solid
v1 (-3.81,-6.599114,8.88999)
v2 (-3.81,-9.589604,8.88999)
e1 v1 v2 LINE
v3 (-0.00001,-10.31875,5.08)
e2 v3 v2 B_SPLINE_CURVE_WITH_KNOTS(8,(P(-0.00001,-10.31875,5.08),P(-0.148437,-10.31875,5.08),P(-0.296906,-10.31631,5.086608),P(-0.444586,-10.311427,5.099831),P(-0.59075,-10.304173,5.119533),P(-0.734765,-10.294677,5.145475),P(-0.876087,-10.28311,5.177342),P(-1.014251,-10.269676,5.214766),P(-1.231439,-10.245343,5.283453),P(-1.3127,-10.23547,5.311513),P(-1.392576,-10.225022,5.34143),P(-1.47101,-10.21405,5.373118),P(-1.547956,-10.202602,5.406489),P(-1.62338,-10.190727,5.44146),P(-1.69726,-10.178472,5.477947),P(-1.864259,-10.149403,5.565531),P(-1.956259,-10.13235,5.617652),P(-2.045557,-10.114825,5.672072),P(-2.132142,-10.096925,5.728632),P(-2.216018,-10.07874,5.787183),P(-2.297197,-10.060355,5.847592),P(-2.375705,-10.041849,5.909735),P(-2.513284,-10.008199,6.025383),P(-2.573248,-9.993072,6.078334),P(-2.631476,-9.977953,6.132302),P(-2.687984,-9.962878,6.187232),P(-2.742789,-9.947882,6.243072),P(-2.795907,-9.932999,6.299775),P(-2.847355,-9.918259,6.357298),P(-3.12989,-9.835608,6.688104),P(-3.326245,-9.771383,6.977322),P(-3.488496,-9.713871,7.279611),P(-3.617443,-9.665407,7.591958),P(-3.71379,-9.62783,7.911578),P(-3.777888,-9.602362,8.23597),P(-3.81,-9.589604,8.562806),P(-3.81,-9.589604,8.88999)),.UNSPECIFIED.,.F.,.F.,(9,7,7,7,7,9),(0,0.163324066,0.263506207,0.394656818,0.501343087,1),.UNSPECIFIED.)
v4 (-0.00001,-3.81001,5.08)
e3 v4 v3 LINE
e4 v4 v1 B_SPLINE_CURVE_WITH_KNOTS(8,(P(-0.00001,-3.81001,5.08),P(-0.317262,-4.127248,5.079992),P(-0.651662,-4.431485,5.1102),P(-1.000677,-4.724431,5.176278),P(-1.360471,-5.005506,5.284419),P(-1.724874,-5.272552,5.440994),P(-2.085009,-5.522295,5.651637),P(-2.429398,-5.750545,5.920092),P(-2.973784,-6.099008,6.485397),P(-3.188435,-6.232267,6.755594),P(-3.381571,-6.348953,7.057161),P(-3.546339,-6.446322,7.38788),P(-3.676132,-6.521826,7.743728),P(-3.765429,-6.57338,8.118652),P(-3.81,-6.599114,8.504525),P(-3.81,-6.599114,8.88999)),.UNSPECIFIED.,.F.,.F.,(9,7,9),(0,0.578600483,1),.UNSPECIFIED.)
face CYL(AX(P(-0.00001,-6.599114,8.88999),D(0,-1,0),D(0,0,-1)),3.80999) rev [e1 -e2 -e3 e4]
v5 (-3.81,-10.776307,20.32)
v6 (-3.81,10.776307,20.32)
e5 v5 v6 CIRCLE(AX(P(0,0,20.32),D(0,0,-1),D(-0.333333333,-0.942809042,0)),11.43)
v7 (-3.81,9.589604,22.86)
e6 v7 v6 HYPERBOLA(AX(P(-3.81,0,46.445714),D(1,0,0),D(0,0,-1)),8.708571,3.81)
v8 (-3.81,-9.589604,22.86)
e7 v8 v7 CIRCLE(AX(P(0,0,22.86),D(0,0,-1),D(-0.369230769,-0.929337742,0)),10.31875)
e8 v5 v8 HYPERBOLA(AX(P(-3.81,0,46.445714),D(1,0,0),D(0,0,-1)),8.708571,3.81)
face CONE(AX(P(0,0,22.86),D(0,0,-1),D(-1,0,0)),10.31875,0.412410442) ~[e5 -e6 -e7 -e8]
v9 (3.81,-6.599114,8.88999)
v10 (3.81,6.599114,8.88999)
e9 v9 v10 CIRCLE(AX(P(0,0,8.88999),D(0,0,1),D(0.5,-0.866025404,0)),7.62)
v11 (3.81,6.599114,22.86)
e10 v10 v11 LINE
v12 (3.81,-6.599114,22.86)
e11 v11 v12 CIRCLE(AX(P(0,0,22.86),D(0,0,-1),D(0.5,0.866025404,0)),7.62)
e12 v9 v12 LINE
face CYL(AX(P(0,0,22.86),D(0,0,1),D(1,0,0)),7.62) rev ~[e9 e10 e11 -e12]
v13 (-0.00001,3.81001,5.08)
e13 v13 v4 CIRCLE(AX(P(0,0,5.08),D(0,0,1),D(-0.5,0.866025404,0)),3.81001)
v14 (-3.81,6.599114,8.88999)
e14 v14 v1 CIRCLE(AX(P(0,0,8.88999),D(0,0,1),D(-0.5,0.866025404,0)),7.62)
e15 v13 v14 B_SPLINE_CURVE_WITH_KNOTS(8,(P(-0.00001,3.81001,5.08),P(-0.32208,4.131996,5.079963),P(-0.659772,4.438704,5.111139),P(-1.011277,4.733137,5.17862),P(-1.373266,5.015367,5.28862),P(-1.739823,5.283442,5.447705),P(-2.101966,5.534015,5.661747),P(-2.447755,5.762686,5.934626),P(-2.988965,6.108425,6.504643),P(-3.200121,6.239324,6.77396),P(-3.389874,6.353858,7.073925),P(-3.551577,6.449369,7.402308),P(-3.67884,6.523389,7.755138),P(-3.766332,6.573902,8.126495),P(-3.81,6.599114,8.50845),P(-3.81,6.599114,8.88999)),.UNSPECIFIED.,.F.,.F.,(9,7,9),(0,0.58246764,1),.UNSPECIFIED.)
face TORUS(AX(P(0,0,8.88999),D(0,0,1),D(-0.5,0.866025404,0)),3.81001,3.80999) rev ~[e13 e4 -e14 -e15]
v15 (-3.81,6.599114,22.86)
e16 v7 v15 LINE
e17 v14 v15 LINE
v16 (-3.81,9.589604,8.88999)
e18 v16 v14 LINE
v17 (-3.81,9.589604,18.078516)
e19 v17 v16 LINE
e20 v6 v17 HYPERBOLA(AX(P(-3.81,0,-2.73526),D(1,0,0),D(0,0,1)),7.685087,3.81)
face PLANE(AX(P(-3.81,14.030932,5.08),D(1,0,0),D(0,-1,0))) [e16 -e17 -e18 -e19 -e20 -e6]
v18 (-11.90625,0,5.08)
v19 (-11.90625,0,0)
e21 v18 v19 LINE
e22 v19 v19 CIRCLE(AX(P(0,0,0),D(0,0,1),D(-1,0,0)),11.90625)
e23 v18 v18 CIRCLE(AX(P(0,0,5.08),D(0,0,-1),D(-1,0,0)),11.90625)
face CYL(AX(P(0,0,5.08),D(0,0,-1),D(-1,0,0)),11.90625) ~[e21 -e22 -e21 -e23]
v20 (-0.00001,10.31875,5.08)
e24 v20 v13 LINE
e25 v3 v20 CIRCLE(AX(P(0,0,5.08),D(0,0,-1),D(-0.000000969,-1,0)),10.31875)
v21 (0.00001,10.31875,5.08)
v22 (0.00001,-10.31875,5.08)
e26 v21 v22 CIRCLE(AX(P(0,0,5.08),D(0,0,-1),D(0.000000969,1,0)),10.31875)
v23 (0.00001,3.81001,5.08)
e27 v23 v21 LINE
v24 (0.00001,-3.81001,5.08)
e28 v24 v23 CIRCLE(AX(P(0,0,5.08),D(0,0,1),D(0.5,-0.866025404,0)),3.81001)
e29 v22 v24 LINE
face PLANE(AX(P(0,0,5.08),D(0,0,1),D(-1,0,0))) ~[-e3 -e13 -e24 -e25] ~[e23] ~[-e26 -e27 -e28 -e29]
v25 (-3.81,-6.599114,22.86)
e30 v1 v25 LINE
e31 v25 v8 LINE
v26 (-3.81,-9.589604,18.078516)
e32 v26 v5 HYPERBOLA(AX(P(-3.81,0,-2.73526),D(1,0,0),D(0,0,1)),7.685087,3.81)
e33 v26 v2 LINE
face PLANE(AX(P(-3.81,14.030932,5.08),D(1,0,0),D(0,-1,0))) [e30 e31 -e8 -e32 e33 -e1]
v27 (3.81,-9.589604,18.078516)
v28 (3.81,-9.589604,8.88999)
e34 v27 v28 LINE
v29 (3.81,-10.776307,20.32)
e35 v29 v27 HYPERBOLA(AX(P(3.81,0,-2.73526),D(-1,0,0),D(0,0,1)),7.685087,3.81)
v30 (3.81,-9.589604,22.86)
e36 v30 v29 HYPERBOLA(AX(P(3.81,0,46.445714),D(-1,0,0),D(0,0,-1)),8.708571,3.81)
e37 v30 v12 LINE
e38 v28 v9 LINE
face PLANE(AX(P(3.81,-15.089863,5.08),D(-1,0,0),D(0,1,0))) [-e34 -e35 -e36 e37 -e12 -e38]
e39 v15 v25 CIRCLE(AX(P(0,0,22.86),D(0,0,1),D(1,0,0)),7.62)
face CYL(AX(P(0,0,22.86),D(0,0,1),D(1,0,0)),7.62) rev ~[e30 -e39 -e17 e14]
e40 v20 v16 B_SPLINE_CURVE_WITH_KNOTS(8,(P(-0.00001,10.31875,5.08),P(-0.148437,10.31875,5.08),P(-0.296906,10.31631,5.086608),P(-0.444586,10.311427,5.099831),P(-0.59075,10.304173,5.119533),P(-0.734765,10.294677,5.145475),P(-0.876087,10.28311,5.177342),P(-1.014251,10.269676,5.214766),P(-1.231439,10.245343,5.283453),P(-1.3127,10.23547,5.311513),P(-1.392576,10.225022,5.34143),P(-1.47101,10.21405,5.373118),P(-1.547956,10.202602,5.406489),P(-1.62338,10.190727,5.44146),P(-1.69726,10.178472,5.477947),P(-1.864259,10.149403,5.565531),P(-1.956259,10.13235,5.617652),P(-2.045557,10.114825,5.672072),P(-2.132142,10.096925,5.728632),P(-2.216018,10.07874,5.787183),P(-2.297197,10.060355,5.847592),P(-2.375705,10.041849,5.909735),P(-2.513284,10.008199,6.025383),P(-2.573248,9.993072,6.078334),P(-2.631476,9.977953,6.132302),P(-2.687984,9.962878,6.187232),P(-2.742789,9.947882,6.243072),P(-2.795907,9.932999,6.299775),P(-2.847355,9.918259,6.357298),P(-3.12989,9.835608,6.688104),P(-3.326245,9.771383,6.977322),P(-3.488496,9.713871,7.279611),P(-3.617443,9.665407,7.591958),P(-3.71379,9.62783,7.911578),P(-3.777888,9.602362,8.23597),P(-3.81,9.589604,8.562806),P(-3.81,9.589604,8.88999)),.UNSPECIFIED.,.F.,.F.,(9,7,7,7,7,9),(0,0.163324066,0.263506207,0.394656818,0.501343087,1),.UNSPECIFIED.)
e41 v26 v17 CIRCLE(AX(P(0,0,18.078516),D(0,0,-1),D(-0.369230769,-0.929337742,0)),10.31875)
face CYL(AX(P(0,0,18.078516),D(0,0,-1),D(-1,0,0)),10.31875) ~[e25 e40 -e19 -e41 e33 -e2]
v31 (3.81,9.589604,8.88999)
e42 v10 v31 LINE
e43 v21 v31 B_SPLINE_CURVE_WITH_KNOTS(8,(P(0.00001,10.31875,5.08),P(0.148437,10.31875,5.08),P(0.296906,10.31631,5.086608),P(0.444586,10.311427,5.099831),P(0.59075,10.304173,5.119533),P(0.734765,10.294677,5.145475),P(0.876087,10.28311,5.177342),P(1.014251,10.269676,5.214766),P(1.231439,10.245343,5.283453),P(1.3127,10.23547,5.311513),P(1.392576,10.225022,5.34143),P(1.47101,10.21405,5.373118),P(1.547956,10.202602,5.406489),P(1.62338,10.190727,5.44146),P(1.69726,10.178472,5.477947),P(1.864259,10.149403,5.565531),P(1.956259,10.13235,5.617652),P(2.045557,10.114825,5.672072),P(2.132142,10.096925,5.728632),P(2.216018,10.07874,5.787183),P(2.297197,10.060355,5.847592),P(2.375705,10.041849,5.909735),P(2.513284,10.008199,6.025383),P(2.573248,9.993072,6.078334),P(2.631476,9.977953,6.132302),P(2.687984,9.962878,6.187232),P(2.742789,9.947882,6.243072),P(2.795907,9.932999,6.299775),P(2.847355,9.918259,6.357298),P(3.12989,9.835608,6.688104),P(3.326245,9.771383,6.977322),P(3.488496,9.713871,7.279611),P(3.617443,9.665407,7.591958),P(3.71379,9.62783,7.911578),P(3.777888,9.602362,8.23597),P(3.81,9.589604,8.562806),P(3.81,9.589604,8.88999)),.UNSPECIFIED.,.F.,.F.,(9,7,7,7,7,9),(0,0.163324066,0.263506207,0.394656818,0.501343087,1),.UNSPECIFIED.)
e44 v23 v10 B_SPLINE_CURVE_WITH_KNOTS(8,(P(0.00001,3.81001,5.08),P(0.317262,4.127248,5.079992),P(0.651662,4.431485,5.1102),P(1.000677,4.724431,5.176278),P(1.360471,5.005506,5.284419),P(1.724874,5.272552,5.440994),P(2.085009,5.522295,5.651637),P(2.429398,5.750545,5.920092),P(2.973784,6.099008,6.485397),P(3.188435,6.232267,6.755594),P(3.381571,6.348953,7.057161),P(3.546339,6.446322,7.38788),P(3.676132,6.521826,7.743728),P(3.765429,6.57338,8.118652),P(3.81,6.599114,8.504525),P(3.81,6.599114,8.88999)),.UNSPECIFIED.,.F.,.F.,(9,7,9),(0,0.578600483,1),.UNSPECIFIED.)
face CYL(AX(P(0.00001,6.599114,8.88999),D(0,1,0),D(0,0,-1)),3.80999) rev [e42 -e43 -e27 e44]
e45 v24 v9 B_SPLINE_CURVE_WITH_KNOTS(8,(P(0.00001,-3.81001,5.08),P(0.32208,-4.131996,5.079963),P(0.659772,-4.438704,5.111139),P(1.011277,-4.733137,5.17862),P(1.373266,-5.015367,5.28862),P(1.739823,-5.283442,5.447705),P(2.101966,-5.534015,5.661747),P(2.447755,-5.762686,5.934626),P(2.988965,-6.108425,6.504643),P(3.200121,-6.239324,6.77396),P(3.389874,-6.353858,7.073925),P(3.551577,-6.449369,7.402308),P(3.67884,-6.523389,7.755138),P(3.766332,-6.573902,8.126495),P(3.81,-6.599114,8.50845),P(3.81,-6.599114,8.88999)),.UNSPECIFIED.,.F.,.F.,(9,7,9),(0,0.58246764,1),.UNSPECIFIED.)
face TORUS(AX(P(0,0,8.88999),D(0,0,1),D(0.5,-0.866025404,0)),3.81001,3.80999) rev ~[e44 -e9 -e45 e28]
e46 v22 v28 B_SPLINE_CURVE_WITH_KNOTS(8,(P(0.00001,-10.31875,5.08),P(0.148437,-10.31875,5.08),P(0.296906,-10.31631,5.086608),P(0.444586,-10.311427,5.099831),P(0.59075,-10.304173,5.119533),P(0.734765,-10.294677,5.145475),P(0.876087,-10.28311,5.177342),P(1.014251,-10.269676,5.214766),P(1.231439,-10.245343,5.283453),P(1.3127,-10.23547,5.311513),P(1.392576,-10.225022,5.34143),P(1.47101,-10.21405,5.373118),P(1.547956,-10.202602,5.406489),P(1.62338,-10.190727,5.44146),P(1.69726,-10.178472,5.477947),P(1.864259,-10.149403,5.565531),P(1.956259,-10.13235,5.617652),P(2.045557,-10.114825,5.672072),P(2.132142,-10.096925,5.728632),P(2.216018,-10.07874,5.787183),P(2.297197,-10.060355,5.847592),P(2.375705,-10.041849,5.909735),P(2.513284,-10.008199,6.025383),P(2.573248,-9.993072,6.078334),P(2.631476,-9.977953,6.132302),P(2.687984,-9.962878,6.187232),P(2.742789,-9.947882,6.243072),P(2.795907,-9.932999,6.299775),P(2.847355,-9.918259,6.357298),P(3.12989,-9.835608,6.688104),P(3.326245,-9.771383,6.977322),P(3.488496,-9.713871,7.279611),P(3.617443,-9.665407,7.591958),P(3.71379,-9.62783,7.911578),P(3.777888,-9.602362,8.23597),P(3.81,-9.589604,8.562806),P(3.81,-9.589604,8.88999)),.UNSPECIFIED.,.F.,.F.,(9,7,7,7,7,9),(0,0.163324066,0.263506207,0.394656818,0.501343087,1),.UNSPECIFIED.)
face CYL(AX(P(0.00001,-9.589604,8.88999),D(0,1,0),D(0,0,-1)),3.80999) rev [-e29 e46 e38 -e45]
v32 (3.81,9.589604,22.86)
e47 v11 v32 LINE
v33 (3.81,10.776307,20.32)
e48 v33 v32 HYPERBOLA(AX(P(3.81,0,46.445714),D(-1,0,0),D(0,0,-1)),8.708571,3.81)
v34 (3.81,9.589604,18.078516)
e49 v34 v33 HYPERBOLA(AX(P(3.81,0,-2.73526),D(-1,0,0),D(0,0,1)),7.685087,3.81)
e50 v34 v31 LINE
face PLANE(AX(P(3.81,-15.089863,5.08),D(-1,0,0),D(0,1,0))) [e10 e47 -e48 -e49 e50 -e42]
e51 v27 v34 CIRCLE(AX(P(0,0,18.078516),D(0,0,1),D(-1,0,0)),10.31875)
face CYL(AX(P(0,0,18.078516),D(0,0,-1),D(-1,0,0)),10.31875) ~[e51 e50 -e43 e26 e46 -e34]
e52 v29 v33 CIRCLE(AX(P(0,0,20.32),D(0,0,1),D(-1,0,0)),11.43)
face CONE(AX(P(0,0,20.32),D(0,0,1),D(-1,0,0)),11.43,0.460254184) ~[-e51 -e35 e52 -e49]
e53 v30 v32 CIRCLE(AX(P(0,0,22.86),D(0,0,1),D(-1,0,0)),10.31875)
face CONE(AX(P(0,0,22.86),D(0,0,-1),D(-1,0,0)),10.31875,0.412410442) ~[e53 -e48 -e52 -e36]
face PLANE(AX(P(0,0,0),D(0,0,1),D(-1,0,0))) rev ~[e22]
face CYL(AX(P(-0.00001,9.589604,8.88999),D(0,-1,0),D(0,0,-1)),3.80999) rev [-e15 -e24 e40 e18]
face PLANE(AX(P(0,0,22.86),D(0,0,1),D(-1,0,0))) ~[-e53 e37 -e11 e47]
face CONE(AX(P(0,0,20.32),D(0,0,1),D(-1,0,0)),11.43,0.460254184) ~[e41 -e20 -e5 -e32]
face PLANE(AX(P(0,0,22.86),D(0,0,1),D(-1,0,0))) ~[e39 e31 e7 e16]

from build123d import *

# Parameters (mm, degrees)
F3_R     = 7.62
F4_DEPTH = 17.78
F6_DEPTH = 25.4
F7_R     = 3.80999


# Not quite as in the source:
# - a fillet or chamfer is up to 0.001 mm smaller than in the source, because OpenCascade refuses the exact size


with BuildPart() as f2:
    # F0 (on Front) → F2 (revolve)
    with BuildSketch(Plane.XZ):
        Polygon((-11.90625, 5.08), (-11.90625, 0), (0, 0), (0, 22.86), (-10.31875, 22.86), (-11.43, 20.32), (-10.31875, 18.0785163727), (-10.31875, 5.08), align=None)
    revolve(axis=Axis((0, 0, 7.382690208), (0, 0, 1)))

    # F3 (on face) → F4 (cut, through all)
    with BuildSketch(Plane.XY.offset(22.86)):
        Circle(F3_R)
    extrude(amount=-F4_DEPTH, mode=Mode.SUBTRACT)

    # F5 (on face) → F6 (cut)
    with BuildSketch(Plane.XY.offset(5.08)):
        Polygon((3.81, 14.0309315175), (-3.81, 14.0309315175), (-3.81, 3.81), (-3.81, -15.0898629799), (3.81, -15.0898629799), (3.81, 3.81), align=None)
    extrude(amount=F6_DEPTH, mode=Mode.SUBTRACT)

    # F7 (radius 3.81 in the source; OpenCascade refuses exactly that, so slightly less here)
    f7_edges = [f2.edges().sort_by_distance(p)[0] for p in [
        (-7.62, 0, 5.08),
        (7.62, 0, 5.08),
        (3.81, 8.094359, 5.08),
        (3.81, -8.094359, 5.08),
        (-3.81, -8.094359, 5.08),
        (-3.81, 8.094359, 5.08),
    ]]
    fillet(f7_edges, radius=F7_R)


solid = f2.part
